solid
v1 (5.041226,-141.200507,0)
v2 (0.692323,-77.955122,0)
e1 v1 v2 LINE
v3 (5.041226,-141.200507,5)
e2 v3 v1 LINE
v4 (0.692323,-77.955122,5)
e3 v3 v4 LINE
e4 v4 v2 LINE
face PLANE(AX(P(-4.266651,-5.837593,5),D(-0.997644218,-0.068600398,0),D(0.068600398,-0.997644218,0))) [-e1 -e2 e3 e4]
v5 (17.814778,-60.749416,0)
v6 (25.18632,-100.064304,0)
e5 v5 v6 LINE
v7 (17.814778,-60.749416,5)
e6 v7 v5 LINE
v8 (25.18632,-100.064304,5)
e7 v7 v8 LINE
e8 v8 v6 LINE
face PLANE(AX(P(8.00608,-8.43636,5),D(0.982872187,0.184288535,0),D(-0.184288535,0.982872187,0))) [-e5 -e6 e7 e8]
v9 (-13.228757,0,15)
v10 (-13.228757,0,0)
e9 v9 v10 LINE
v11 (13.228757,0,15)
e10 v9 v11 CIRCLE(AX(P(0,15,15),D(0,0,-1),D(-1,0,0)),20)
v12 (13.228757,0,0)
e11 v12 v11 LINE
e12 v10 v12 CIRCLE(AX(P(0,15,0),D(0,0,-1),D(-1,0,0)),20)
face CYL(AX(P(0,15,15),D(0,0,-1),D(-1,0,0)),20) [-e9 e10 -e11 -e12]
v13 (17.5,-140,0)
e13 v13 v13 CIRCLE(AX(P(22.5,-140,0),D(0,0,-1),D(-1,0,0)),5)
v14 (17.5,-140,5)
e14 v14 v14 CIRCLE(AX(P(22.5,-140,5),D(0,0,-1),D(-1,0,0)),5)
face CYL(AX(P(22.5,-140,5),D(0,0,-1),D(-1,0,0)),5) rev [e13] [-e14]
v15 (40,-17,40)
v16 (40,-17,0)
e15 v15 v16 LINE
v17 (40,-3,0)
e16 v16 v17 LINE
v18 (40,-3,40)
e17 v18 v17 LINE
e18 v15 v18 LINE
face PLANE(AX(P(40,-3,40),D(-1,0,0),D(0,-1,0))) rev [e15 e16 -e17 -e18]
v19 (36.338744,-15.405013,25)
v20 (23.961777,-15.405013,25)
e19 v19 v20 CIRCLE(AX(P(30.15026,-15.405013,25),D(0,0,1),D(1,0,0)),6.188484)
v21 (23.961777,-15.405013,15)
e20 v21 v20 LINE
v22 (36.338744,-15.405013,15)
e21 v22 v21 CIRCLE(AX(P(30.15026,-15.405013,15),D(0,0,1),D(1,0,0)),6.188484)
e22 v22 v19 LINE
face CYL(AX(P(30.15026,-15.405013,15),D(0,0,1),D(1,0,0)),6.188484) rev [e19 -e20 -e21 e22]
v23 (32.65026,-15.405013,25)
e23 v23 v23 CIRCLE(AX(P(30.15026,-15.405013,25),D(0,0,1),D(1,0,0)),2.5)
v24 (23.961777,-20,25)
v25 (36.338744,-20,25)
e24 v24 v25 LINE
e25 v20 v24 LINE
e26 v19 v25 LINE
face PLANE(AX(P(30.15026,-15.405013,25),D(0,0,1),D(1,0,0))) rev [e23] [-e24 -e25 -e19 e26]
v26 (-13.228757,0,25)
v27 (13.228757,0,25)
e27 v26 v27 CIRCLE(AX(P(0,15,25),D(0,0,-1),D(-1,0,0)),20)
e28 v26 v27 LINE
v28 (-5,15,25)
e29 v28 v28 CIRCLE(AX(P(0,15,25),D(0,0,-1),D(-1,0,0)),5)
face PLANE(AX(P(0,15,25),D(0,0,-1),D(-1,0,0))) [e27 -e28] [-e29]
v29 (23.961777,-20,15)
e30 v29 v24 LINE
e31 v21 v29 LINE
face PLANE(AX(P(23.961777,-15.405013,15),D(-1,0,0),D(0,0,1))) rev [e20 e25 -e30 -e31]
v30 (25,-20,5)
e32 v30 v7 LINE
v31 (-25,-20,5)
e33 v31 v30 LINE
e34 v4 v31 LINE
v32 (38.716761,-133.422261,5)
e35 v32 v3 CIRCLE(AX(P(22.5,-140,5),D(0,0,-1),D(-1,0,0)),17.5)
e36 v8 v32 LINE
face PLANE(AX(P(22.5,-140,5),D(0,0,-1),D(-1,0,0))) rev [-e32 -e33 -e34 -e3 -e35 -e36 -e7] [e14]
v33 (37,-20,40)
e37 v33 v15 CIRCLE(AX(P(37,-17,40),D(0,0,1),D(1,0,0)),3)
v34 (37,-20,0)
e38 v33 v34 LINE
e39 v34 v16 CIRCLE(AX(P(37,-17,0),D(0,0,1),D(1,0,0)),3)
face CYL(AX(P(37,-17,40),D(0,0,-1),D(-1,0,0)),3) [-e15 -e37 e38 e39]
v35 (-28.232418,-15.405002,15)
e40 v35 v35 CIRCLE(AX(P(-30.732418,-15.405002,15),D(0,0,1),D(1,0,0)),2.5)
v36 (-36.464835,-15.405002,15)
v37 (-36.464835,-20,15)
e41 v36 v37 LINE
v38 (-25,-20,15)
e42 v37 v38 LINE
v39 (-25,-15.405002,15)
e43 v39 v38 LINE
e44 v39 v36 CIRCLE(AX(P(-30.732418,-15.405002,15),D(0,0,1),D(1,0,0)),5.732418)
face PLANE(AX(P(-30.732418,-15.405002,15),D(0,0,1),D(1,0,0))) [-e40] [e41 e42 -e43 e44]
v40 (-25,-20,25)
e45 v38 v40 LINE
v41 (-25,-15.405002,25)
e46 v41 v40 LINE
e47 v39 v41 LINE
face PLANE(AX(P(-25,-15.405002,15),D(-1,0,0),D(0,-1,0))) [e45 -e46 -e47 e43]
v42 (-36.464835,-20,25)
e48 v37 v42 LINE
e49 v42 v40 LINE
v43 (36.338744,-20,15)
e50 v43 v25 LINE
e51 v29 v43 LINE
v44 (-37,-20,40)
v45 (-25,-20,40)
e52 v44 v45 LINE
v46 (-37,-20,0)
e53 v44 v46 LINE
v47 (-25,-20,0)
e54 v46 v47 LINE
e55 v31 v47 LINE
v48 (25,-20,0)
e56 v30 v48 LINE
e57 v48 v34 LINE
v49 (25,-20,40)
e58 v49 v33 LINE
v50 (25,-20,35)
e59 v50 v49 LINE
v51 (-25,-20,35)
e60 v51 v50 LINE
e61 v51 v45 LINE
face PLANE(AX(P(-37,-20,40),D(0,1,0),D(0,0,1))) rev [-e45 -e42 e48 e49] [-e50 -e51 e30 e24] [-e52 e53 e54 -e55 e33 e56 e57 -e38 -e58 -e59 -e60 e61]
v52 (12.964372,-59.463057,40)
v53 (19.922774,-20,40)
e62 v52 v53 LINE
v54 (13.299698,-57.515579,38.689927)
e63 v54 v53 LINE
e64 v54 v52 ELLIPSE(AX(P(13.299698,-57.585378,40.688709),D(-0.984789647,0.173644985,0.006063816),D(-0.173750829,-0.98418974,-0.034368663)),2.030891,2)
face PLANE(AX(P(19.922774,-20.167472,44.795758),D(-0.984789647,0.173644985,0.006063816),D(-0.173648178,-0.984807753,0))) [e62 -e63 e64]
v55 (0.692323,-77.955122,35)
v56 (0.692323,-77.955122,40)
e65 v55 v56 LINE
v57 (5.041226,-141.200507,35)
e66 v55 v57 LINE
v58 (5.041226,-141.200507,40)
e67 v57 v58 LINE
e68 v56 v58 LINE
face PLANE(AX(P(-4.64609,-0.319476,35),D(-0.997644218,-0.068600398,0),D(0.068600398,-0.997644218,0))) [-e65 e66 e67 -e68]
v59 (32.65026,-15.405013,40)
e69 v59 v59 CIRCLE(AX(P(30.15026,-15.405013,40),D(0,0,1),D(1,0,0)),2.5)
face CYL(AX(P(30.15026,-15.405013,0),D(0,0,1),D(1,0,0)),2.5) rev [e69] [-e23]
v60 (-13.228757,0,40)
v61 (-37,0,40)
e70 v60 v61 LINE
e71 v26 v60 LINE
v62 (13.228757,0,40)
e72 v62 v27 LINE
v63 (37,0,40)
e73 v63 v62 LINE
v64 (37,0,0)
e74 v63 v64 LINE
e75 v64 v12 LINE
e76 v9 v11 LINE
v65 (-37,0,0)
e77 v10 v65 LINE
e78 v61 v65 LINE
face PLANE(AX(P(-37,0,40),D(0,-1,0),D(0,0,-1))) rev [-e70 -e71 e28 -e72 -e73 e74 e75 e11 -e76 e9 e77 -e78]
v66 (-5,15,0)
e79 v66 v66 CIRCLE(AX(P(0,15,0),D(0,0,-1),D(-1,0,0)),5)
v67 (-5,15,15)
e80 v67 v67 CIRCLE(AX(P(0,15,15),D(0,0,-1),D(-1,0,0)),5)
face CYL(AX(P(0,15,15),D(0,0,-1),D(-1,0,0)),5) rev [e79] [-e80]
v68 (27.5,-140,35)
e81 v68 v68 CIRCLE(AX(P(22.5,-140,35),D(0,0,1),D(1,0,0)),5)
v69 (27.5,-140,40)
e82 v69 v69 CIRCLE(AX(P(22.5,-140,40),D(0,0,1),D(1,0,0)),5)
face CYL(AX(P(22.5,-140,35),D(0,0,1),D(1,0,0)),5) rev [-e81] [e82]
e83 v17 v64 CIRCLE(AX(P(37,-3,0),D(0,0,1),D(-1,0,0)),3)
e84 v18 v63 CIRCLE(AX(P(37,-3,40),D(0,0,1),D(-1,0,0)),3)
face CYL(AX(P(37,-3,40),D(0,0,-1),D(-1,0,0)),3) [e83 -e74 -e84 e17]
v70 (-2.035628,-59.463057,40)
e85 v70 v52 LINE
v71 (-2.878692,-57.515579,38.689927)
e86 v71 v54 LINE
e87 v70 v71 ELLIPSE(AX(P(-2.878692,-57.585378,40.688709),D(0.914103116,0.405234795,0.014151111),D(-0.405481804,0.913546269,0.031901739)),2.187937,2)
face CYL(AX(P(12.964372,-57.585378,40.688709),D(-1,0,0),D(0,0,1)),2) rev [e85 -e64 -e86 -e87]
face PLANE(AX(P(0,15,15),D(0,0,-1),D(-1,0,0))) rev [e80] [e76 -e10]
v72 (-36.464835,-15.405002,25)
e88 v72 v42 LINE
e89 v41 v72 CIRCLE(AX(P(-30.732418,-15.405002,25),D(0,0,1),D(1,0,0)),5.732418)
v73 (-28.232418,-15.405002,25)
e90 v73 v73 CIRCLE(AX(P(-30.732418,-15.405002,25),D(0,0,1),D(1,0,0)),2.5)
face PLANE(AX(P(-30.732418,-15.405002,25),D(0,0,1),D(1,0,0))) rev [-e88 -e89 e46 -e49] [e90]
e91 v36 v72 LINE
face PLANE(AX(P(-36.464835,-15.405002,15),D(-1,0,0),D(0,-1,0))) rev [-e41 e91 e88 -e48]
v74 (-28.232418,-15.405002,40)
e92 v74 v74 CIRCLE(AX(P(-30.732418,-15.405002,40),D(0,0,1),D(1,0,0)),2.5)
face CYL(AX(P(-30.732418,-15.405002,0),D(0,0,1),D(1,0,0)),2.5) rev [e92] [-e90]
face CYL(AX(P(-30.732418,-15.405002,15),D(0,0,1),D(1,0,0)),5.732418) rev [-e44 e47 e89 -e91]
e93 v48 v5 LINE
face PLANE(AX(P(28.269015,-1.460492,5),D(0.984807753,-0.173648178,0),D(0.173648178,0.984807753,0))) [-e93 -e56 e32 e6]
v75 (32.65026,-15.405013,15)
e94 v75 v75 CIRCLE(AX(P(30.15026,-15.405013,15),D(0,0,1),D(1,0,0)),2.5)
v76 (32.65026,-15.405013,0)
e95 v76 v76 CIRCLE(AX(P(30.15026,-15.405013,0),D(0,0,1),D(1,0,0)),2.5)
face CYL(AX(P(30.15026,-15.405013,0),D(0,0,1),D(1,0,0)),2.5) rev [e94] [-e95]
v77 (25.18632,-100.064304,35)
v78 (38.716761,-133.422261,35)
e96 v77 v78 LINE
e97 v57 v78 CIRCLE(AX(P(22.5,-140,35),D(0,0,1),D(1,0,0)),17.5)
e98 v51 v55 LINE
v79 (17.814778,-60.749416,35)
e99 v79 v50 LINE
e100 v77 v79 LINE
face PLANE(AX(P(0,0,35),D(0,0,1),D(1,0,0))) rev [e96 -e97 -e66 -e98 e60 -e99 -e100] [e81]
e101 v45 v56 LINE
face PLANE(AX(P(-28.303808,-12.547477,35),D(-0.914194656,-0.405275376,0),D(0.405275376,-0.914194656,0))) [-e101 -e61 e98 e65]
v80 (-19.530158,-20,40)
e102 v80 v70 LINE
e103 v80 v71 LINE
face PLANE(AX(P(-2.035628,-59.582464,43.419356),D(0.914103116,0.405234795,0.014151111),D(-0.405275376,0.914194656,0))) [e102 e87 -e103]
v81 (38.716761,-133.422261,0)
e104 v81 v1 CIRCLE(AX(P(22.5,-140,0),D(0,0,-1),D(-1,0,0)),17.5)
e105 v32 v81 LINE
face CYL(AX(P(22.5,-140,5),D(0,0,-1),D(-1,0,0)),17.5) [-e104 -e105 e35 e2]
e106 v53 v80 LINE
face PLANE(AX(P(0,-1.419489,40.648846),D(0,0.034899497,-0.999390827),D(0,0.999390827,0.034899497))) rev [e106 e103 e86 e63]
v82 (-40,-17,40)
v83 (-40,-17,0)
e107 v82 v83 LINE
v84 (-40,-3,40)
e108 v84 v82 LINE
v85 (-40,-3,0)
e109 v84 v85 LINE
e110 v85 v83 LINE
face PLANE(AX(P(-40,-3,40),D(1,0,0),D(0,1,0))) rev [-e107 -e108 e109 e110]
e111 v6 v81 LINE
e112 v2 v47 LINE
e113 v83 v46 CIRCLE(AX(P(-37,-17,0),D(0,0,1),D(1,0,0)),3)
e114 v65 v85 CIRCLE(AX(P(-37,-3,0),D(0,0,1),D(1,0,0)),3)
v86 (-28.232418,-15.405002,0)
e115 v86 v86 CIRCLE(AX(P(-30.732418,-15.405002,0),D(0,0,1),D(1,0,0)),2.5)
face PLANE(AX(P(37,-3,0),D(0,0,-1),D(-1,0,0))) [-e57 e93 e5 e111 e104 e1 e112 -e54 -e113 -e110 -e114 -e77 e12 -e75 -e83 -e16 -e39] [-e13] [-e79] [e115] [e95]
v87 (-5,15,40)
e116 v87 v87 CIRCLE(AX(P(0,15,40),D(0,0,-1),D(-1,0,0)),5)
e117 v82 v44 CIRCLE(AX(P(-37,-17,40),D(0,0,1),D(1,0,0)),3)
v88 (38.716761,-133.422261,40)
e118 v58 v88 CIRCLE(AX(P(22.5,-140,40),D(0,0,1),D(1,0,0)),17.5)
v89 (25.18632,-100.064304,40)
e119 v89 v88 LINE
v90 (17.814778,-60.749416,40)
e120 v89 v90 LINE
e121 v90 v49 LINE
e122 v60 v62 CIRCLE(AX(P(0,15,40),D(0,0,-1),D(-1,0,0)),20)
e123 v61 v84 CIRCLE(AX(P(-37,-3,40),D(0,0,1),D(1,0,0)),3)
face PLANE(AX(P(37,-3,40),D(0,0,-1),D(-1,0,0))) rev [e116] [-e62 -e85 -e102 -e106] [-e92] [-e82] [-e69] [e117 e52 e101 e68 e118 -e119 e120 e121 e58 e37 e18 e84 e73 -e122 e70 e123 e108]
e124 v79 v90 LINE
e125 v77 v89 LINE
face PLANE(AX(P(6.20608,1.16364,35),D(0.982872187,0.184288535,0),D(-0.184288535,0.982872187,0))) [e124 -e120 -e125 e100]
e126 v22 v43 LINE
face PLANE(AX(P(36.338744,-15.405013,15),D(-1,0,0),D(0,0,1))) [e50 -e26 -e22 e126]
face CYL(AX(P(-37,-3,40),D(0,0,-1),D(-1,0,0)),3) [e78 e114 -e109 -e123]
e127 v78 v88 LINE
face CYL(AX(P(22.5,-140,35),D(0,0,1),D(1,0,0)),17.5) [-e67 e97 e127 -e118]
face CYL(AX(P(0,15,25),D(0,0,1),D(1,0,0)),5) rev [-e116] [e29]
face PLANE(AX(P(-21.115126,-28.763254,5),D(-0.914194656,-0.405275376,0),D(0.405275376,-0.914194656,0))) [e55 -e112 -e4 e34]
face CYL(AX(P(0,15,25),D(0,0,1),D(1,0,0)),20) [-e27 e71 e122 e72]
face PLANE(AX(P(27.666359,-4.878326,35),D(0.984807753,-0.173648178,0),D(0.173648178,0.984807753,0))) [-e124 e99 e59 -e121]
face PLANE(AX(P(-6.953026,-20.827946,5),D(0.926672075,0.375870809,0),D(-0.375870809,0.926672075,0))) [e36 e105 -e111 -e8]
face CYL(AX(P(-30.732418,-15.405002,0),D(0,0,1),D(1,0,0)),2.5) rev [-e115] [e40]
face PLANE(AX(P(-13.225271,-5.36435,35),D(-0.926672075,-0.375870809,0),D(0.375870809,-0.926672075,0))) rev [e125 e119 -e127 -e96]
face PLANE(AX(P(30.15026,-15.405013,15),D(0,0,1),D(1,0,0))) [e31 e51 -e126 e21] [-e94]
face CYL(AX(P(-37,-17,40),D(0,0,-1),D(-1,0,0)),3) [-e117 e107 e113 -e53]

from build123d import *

# Parameters (mm, degrees)
SALIENTE_EXTRUIR1_DEPTH    = 40
CROQUIS2_R                 = 5
SALIENTE_EXTRUIR2_DEPTH    = 5
SALIENTE_EXTRUIR3_START    = -35
CROQUIS2_4_R               = 5
SALIENTE_EXTRUIR3_DEPTH    = 5
CORTAR_EXTRUIR1_DEPTH      = 167.172965861
REDONDEO5_R                = 2
CORTAR_EXTRUIR2_DEPTH      = 5
CORTAR_EXTRUIR3_DEPTH      = 164.7261433
CORTAR_EXTRUIR3_DEPTH_BACK = 164.7261433
CROQUIS4_4_R               = 2.5
SALIENTE_EXTRUIR5_START    = 20
CROQUIS7_R                 = 20
CROQUIS7_R_2               = 5
SALIENTE_EXTRUIR5_DEPTH    = 15
SALIENTE_EXTRUIR6_START    = -5
CROQUIS7_2_R               = 20
CROQUIS7_2_R_2             = 5
SALIENTE_EXTRUIR6_DEPTH    = 15


with BuildPart() as part:
    # Croquis1 → Saliente-Extruir1 (new body)
    with BuildSketch(Plane.XY):
        with BuildLine():
            Line((-37, 0), (37, 0))
            ThreePointArc((37, 0), (39.121320344, -0.878679656), (40, -3))
            Line((40, -3), (40, -17))
            ThreePointArc((40, -17), (39.121320344, -19.121320344), (37, -20))
            Line((37, -20), (-37, -20))
            ThreePointArc((-37, -20), (-39.121320344, -19.121320344), (-40, -17))
            Line((-40, -17), (-40, -3))
            ThreePointArc((-40, -3), (-39.121320344, -0.878679656), (-37, 0))
        make_face()
    extrude(amount=SALIENTE_EXTRUIR1_DEPTH)

    # Croquis2 → Saliente-Extruir2 (add)
    with BuildSketch(Plane.XY.offset(40)):
        with BuildLine():
            Line((-25, -20), (0.692322562, -77.955122319))
            Line((0.692322562, -77.955122319), (5.041226188, -141.200506964))
            ThreePointArc((5.041226188, -141.200506964), (26.438391415, -157.05107249), (38.716761316, -133.422260844))
            Line((38.716761316, -133.422260844), (25.186319846, -100.064303858))
            Line((25.186319846, -100.064303858), (17.814778444, -60.749416381))
            Line((17.814778444, -60.749416381), (25, -20))
            Line((25, -20), (0, -20))
            Line((0, -20), (-25, -20))
        make_face()
        with Locations((22.5, -140)):
            Circle(CROQUIS2_R, mode=Mode.SUBTRACT)
    extrude(amount=-SALIENTE_EXTRUIR2_DEPTH)

    # Croquis2<4> → Saliente-Extruir3 (add)
    with BuildSketch(Plane.XY.offset(40).offset(SALIENTE_EXTRUIR3_START)):
        with BuildLine():
            Line((-25, -20), (0.692322562, -77.955122319))
            Line((0.692322562, -77.955122319), (5.041226188, -141.200506964))
            ThreePointArc((5.041226188, -141.200506964), (26.438391415, -157.05107249), (38.716761316, -133.422260844))
            Line((38.716761316, -133.422260844), (25.186319846, -100.064303858))
            Line((25.186319846, -100.064303858), (17.814778444, -60.749416381))
            Line((17.814778444, -60.749416381), (25, -20))
            Line((25, -20), (0, -20))
            Line((0, -20), (-25, -20))
        make_face()
        with Locations((22.5, -140)):
            Circle(CROQUIS2_4_R, mode=Mode.SUBTRACT)
    extrude(amount=-SALIENTE_EXTRUIR3_DEPTH)

    # Croquis3 → Cortar-Extruir1 (cut, through all)
    with BuildSketch(Plane(origin=(0, -1.419488972, 40.648845743), x_dir=(1, 0, 0), z_dir=(0, -0.034899496702501046, 0.9993908270190958))):
        Polygon((-19.530157581, -18.591836672), (19.922773595, -18.591836672), (12.964371873, -58.030854026), (-2.035628127, -58.030854026), align=None)
    extrude(amount=CORTAR_EXTRUIR1_DEPTH, mode=Mode.SUBTRACT)

    # Redondeo5
    # the kernel refuses this fillet: 2 mm, written as the material it adds along each edge
    with BuildSketch(Plane(origin=(17.715799962, -59.41499217, 38.623598144), x_dir=(0, 0.9993908270190957, 0.03489949670250261), z_dir=(-1, 0, 0))) as redondeo5_piece_1:
        with BuildLine():
            CenterArc((1.900571235, -2), REDONDEO5_R, 90, 71.857609754)
            Line((0, -1.377240834), (-0.038011425, -1.364785651))
            ThreePointArc((-0.038011425, -1.364785651), (-0.04, -0.688620417), (-0.04, 0))
            Line((-0.04, 0), (0, 0.04))
            Line((0, 0.04), (1.900571235, 0.04))
            Line((1.900571235, 0.04), (1.900571235, 0))
        make_face()
    extrude(amount=24.502856177)

    # Croquis4 → Cortar-Extruir2 (cut, symmetric)
    with BuildSketch(Plane.XY.offset(20)):
        with BuildLine():
            Line((-36.464835441, -15.405002376), (-36.464835441, -20))
            Line((-36.464835441, -20), (-25, -20))
            Line((-25, -20), (-25, -15.405002376))
            ThreePointArc((-25, -15.405002376), (-30.732417721, -9.672584656), (-36.464835441, -15.405002376))
        make_face()
        with BuildLine():
            Line((36.338744123, -15.405012958), (36.338744123, -20))
            Line((36.338744123, -20), (23.961776552, -20))
            Line((23.961776552, -20), (23.961776552, -15.405012958))
            ThreePointArc((23.961776552, -15.405012958), (30.150260338, -9.216529173), (36.338744123, -15.405012958))
        make_face()
    extrude(amount=CORTAR_EXTRUIR2_DEPTH, both=True, mode=Mode.SUBTRACT)

    # Croquis4<4> → Cortar-Extruir3 (cut, two sides: drawn at the far end of the back side and taken through both)
    with BuildSketch(Plane.XY.offset(20).offset(-CORTAR_EXTRUIR3_DEPTH_BACK)):
        with Locations((-30.732417721, -15.405002376)):
            Circle(CROQUIS4_4_R)
        with Locations((30.150260338, -15.405012958)):
            Circle(CROQUIS4_4_R)
    extrude(amount=CORTAR_EXTRUIR3_DEPTH + CORTAR_EXTRUIR3_DEPTH_BACK, mode=Mode.SUBTRACT)

    # Croquis7 → Saliente-Extruir5 (add)
    with BuildSketch(Plane.XY.offset(20).offset(SALIENTE_EXTRUIR5_START)):
        with Locations((0, 15)):
            Circle(CROQUIS7_R)
        with Locations(Location((0, 15, 0), (0, 0, 180))):
            Circle(CROQUIS7_R_2, mode=Mode.SUBTRACT)
    extrude(amount=-SALIENTE_EXTRUIR5_DEPTH)

    # Croquis7<2> → Saliente-Extruir6 (add)
    with BuildSketch(Plane.XY.offset(20).offset(SALIENTE_EXTRUIR6_START)):
        with Locations((0, 15)):
            Circle(CROQUIS7_2_R)
        with Locations(Location((0, 15, 0), (0, 0, 180))):
            Circle(CROQUIS7_2_R_2, mode=Mode.SUBTRACT)
    extrude(amount=-SALIENTE_EXTRUIR6_DEPTH)


solid = part.part
